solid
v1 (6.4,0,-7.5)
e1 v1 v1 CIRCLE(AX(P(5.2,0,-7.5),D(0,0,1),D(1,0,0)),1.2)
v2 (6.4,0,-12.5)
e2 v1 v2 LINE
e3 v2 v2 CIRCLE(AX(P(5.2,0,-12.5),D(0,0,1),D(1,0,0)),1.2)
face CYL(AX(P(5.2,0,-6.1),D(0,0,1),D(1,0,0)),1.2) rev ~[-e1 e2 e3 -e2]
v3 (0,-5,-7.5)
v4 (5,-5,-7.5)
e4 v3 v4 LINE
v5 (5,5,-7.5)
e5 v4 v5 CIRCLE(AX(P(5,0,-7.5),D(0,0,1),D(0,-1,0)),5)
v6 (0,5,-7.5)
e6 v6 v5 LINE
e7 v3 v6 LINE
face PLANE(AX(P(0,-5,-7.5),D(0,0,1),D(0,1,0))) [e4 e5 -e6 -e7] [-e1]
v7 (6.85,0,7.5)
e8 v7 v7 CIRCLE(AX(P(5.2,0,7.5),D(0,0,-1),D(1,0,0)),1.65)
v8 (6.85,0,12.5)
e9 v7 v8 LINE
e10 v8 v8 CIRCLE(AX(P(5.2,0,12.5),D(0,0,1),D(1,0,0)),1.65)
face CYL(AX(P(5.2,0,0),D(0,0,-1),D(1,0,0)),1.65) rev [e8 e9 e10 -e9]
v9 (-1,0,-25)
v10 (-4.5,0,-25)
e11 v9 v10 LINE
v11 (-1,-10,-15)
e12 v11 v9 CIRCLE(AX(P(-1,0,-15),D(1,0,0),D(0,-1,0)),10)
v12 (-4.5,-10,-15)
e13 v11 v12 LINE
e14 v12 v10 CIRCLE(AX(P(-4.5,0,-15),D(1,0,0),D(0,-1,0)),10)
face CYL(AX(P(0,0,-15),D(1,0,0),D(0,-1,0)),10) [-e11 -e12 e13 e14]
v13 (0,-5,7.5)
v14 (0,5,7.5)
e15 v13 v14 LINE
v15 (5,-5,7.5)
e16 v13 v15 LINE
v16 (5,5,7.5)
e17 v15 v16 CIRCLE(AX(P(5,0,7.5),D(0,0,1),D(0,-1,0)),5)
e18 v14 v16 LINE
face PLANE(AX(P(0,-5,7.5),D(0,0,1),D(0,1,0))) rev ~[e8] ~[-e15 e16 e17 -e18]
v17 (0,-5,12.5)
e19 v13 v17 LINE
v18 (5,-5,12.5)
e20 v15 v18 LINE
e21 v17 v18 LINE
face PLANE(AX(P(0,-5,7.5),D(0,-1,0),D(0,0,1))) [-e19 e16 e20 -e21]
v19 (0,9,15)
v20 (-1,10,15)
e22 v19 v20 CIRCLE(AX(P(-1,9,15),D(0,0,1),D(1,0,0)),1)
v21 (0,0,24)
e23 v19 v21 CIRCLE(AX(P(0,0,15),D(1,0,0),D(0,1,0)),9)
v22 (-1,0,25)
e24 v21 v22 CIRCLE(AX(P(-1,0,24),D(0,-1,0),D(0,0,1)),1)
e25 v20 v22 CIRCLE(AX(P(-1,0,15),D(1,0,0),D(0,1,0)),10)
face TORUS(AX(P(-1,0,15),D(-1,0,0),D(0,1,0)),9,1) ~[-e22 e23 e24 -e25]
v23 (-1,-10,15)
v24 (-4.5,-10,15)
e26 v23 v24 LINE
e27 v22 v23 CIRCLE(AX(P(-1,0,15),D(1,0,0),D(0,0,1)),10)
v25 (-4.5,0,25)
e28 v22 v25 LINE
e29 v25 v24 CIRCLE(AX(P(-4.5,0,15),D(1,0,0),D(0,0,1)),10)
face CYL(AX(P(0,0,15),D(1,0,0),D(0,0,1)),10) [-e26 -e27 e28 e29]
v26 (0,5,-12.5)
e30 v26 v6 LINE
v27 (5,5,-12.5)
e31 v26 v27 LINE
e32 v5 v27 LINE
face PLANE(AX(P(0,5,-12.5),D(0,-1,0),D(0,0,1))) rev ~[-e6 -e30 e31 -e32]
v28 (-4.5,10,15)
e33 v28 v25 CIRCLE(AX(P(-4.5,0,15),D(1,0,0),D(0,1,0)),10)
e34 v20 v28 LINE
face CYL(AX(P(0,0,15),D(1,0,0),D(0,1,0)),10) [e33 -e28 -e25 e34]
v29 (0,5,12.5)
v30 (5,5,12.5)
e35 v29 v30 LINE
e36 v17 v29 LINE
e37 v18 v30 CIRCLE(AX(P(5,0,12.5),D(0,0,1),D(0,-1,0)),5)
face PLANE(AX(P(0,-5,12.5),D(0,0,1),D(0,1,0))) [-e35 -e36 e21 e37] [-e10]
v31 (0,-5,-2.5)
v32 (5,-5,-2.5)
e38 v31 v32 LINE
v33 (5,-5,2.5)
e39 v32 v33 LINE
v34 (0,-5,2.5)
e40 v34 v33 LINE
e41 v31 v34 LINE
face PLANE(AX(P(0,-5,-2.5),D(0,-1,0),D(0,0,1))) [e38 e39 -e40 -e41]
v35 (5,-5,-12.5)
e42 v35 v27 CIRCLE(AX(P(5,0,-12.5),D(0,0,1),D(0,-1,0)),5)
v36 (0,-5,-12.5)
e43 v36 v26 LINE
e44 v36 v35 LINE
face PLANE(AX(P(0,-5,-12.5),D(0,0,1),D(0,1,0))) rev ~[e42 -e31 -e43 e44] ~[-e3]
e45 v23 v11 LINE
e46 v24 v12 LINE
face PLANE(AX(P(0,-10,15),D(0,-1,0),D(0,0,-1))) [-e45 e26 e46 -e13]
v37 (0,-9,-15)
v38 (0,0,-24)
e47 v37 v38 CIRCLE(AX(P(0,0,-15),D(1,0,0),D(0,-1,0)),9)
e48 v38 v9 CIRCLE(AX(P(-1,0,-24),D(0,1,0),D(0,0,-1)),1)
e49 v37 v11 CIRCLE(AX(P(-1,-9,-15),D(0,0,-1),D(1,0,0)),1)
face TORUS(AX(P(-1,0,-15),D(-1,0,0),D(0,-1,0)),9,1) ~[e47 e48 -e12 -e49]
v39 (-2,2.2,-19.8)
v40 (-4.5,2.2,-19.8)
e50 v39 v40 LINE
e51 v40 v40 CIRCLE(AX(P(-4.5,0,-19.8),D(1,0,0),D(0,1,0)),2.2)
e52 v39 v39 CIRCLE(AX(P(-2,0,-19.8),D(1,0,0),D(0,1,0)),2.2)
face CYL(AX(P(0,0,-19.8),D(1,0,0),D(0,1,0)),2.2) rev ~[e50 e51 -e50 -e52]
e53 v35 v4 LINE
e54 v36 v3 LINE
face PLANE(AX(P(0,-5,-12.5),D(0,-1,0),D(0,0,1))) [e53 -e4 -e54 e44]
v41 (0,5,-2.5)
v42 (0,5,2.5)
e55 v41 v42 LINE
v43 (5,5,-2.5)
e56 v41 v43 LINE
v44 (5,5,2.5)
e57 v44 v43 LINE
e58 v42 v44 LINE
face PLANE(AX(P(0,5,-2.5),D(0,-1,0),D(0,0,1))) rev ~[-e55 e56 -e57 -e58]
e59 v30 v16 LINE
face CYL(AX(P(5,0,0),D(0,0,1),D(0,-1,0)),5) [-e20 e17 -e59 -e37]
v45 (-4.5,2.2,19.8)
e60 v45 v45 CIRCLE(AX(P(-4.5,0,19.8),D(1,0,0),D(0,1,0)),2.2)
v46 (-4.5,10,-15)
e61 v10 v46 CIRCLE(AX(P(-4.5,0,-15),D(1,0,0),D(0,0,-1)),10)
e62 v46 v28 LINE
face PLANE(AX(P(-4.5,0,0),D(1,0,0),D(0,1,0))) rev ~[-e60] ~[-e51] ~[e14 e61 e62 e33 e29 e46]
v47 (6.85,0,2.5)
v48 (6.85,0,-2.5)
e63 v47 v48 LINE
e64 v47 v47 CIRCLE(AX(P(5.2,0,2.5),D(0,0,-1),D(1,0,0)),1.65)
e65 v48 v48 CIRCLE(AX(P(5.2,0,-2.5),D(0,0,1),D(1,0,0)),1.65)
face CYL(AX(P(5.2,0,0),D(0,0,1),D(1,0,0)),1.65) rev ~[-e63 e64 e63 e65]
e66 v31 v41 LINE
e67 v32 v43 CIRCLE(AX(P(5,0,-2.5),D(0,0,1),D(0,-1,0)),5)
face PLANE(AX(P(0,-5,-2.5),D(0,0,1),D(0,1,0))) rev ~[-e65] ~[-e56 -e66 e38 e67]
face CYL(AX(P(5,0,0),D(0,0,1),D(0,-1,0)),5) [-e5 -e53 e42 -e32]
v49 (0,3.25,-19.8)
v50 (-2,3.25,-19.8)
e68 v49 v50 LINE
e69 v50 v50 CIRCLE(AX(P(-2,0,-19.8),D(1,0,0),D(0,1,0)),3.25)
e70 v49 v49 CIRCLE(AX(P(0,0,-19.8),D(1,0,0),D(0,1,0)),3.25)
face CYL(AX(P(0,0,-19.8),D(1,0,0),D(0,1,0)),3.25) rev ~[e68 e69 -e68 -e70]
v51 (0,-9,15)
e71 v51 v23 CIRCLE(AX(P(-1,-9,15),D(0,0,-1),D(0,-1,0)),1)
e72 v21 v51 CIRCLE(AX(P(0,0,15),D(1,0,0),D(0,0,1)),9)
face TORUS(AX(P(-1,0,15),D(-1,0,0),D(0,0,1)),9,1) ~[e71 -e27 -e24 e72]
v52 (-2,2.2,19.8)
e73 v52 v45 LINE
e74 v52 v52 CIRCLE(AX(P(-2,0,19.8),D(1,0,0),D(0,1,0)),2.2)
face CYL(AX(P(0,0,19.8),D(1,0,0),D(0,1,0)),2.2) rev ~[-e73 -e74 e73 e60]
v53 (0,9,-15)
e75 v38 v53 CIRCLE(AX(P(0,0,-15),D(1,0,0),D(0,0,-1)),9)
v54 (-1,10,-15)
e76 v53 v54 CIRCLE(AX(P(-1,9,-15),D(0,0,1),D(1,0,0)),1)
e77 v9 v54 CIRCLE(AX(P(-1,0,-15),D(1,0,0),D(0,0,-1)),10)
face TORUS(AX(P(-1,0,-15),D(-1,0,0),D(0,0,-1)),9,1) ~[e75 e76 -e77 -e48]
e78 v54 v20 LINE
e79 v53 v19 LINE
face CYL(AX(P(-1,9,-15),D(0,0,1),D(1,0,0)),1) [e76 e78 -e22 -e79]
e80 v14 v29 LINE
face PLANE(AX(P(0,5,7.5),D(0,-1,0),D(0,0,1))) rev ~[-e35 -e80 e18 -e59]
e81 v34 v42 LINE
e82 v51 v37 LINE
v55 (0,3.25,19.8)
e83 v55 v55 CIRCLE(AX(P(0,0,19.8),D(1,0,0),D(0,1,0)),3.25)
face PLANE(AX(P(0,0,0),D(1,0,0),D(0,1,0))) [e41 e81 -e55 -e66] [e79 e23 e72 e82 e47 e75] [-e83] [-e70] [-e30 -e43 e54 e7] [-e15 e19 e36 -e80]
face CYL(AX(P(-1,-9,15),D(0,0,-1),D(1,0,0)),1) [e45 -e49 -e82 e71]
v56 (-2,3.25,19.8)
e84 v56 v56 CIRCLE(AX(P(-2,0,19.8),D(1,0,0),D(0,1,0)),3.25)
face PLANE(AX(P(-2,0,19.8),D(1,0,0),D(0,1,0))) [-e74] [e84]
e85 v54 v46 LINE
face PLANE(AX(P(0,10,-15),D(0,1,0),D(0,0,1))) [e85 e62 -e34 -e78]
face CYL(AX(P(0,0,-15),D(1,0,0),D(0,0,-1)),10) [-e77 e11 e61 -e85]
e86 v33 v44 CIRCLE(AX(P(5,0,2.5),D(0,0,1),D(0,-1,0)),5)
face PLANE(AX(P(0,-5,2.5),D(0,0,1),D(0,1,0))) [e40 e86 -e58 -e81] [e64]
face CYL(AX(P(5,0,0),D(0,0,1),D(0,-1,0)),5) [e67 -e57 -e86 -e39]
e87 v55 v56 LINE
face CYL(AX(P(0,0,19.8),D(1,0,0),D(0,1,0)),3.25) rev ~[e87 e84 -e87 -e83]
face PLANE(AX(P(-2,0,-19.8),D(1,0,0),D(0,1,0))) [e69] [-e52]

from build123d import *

# Parameters (mm, degrees)
F0_R          = 3.25
F0_W          = 10
F0_H          = 5
F0_R_2        = 2.2
F2_DEPTH      = 4.5
F3_DEPTH      = 10
F1_R          = 1.65
F1_R_2        = 1.2
F4_DEPTH      = 25
F5_DEPTH      = 2.5
F5_DEPTH_BACK = 12.5
F6_START      = -6.1
F6_DEPTH      = 8.5
F7_DEPTH      = 2
F8_R          = 1


with BuildPart() as f2:
    # F0 (on Right) → F2 (new body)
    with BuildSketch(Plane.YZ):
        with BuildLine():
            ThreePointArc((0, 25), (-7.0710678119, 22.0710678119), (-10, 15))
            Line((-10, 15), (-10, -15))
            ThreePointArc((-10, -15), (-7.0710678119, -22.0710678119), (0, -25))
            ThreePointArc((0, -25), (7.0710678119, -22.0710678119), (10, -15))
            Line((10, -15), (10, 15))
            ThreePointArc((10, 15), (7.0710678119, 22.0710678119), (0, 25))
        make_face()
        with Locations((0, -19.8)):
            Circle(F0_R, mode=Mode.SUBTRACT)
        with Locations((0, -10)):
            Rectangle(F0_W, F0_H, mode=Mode.SUBTRACT)
        Rectangle(F0_W, F0_H, mode=Mode.SUBTRACT)
        with Locations((0, 10)):
            Rectangle(F0_W, F0_H, mode=Mode.SUBTRACT)
        with Locations((0, 19.8)):
            Circle(F0_R, mode=Mode.SUBTRACT)
        with Locations((0, 10)):
            Rectangle(F0_W, F0_H)
        Rectangle(F0_W, F0_H)
        with Locations((0, -10)):
            Rectangle(F0_W, F0_H)
        with Locations((0, 19.8)):
            Circle(F0_R)
        with Locations((0, 19.8)):
            Circle(F0_R_2, mode=Mode.SUBTRACT)
        with Locations((0, -19.8)):
            Circle(F0_R)
        with Locations((0, -19.8)):
            Circle(F0_R_2, mode=Mode.SUBTRACT)
    extrude(amount=-F2_DEPTH)

    # F0 (on Right) → F3 (join)
    with BuildSketch(Plane.YZ):
        with Locations((0, 10)):
            Rectangle(F0_W, F0_H)
        Rectangle(F0_W, F0_H)
        with Locations((0, -10)):
            Rectangle(F0_W, F0_H)
    extrude(amount=F3_DEPTH)

    # F1 (on Top) → F4 (intersect, symmetric)
    with BuildSketch(Plane.XY):
        Polygon((0, -5), (0, 5), (0, 10), (-4.5, 10), (-4.5, -10), (0, -10), align=None)
        with BuildLine():
            Line((5, 5), (0, 5))
            Line((0, 5), (0, -5))
            Line((0, -5), (5, -5))
            ThreePointArc((5, -5), (8.5355339059, -3.5355339059), (10, 0))
            ThreePointArc((10, 0), (8.5355339059, 3.5355339059), (5, 5))
        make_face()
        with Locations((5.2, 0)):
            Circle(F1_R, mode=Mode.SUBTRACT)
        with Locations((5.2, 0)):
            Circle(F1_R)
        with Locations((5.2, 0)):
            Circle(F1_R_2, mode=Mode.SUBTRACT)
        with Locations((5.2, 0)):
            Circle(F1_R_2)
    extrude(amount=F4_DEPTH, both=True, mode=Mode.INTERSECT)

    # F1 (on Top) → F5 (cut, two sides)
    with BuildSketch(Plane.XY) as f5_sk:
        with Locations((5.2, 0)):
            Circle(F1_R)
        with Locations((5.2, 0)):
            Circle(F1_R_2, mode=Mode.SUBTRACT)
        with Locations((5.2, 0)):
            Circle(F1_R_2)
    extrude(amount=-F5_DEPTH, mode=Mode.SUBTRACT)
    extrude(f5_sk.sketch, amount=F5_DEPTH_BACK, mode=Mode.SUBTRACT)

    # F1 (on Top) → F6 (cut)
    with BuildSketch(Plane.XY.offset(F6_START)):
        with Locations((5.2, 0)):
            Circle(F1_R_2)
    extrude(amount=-F6_DEPTH, mode=Mode.SUBTRACT)

    # F0 (on Right) → F7 (cut)
    with BuildSketch(Plane.YZ):
        with Locations((0, 19.8)):
            Circle(F0_R)
        with Locations((0, 19.8)):
            Circle(F0_R_2, mode=Mode.SUBTRACT)
        with Locations((0, -19.8)):
            Circle(F0_R)
        with Locations((0, -19.8)):
            Circle(F0_R_2, mode=Mode.SUBTRACT)
    extrude(amount=-F7_DEPTH, mode=Mode.SUBTRACT)

    # F8
    f8_edges = [f2.edges().sort_by_distance(p)[0] for p in [
        (0, 10, 0),
        (0, 0, -25),
        (0, 0, 25),
        (0, -10, 0),
    ]]
    fillet(f8_edges, radius=F8_R)


solid = f2.part
